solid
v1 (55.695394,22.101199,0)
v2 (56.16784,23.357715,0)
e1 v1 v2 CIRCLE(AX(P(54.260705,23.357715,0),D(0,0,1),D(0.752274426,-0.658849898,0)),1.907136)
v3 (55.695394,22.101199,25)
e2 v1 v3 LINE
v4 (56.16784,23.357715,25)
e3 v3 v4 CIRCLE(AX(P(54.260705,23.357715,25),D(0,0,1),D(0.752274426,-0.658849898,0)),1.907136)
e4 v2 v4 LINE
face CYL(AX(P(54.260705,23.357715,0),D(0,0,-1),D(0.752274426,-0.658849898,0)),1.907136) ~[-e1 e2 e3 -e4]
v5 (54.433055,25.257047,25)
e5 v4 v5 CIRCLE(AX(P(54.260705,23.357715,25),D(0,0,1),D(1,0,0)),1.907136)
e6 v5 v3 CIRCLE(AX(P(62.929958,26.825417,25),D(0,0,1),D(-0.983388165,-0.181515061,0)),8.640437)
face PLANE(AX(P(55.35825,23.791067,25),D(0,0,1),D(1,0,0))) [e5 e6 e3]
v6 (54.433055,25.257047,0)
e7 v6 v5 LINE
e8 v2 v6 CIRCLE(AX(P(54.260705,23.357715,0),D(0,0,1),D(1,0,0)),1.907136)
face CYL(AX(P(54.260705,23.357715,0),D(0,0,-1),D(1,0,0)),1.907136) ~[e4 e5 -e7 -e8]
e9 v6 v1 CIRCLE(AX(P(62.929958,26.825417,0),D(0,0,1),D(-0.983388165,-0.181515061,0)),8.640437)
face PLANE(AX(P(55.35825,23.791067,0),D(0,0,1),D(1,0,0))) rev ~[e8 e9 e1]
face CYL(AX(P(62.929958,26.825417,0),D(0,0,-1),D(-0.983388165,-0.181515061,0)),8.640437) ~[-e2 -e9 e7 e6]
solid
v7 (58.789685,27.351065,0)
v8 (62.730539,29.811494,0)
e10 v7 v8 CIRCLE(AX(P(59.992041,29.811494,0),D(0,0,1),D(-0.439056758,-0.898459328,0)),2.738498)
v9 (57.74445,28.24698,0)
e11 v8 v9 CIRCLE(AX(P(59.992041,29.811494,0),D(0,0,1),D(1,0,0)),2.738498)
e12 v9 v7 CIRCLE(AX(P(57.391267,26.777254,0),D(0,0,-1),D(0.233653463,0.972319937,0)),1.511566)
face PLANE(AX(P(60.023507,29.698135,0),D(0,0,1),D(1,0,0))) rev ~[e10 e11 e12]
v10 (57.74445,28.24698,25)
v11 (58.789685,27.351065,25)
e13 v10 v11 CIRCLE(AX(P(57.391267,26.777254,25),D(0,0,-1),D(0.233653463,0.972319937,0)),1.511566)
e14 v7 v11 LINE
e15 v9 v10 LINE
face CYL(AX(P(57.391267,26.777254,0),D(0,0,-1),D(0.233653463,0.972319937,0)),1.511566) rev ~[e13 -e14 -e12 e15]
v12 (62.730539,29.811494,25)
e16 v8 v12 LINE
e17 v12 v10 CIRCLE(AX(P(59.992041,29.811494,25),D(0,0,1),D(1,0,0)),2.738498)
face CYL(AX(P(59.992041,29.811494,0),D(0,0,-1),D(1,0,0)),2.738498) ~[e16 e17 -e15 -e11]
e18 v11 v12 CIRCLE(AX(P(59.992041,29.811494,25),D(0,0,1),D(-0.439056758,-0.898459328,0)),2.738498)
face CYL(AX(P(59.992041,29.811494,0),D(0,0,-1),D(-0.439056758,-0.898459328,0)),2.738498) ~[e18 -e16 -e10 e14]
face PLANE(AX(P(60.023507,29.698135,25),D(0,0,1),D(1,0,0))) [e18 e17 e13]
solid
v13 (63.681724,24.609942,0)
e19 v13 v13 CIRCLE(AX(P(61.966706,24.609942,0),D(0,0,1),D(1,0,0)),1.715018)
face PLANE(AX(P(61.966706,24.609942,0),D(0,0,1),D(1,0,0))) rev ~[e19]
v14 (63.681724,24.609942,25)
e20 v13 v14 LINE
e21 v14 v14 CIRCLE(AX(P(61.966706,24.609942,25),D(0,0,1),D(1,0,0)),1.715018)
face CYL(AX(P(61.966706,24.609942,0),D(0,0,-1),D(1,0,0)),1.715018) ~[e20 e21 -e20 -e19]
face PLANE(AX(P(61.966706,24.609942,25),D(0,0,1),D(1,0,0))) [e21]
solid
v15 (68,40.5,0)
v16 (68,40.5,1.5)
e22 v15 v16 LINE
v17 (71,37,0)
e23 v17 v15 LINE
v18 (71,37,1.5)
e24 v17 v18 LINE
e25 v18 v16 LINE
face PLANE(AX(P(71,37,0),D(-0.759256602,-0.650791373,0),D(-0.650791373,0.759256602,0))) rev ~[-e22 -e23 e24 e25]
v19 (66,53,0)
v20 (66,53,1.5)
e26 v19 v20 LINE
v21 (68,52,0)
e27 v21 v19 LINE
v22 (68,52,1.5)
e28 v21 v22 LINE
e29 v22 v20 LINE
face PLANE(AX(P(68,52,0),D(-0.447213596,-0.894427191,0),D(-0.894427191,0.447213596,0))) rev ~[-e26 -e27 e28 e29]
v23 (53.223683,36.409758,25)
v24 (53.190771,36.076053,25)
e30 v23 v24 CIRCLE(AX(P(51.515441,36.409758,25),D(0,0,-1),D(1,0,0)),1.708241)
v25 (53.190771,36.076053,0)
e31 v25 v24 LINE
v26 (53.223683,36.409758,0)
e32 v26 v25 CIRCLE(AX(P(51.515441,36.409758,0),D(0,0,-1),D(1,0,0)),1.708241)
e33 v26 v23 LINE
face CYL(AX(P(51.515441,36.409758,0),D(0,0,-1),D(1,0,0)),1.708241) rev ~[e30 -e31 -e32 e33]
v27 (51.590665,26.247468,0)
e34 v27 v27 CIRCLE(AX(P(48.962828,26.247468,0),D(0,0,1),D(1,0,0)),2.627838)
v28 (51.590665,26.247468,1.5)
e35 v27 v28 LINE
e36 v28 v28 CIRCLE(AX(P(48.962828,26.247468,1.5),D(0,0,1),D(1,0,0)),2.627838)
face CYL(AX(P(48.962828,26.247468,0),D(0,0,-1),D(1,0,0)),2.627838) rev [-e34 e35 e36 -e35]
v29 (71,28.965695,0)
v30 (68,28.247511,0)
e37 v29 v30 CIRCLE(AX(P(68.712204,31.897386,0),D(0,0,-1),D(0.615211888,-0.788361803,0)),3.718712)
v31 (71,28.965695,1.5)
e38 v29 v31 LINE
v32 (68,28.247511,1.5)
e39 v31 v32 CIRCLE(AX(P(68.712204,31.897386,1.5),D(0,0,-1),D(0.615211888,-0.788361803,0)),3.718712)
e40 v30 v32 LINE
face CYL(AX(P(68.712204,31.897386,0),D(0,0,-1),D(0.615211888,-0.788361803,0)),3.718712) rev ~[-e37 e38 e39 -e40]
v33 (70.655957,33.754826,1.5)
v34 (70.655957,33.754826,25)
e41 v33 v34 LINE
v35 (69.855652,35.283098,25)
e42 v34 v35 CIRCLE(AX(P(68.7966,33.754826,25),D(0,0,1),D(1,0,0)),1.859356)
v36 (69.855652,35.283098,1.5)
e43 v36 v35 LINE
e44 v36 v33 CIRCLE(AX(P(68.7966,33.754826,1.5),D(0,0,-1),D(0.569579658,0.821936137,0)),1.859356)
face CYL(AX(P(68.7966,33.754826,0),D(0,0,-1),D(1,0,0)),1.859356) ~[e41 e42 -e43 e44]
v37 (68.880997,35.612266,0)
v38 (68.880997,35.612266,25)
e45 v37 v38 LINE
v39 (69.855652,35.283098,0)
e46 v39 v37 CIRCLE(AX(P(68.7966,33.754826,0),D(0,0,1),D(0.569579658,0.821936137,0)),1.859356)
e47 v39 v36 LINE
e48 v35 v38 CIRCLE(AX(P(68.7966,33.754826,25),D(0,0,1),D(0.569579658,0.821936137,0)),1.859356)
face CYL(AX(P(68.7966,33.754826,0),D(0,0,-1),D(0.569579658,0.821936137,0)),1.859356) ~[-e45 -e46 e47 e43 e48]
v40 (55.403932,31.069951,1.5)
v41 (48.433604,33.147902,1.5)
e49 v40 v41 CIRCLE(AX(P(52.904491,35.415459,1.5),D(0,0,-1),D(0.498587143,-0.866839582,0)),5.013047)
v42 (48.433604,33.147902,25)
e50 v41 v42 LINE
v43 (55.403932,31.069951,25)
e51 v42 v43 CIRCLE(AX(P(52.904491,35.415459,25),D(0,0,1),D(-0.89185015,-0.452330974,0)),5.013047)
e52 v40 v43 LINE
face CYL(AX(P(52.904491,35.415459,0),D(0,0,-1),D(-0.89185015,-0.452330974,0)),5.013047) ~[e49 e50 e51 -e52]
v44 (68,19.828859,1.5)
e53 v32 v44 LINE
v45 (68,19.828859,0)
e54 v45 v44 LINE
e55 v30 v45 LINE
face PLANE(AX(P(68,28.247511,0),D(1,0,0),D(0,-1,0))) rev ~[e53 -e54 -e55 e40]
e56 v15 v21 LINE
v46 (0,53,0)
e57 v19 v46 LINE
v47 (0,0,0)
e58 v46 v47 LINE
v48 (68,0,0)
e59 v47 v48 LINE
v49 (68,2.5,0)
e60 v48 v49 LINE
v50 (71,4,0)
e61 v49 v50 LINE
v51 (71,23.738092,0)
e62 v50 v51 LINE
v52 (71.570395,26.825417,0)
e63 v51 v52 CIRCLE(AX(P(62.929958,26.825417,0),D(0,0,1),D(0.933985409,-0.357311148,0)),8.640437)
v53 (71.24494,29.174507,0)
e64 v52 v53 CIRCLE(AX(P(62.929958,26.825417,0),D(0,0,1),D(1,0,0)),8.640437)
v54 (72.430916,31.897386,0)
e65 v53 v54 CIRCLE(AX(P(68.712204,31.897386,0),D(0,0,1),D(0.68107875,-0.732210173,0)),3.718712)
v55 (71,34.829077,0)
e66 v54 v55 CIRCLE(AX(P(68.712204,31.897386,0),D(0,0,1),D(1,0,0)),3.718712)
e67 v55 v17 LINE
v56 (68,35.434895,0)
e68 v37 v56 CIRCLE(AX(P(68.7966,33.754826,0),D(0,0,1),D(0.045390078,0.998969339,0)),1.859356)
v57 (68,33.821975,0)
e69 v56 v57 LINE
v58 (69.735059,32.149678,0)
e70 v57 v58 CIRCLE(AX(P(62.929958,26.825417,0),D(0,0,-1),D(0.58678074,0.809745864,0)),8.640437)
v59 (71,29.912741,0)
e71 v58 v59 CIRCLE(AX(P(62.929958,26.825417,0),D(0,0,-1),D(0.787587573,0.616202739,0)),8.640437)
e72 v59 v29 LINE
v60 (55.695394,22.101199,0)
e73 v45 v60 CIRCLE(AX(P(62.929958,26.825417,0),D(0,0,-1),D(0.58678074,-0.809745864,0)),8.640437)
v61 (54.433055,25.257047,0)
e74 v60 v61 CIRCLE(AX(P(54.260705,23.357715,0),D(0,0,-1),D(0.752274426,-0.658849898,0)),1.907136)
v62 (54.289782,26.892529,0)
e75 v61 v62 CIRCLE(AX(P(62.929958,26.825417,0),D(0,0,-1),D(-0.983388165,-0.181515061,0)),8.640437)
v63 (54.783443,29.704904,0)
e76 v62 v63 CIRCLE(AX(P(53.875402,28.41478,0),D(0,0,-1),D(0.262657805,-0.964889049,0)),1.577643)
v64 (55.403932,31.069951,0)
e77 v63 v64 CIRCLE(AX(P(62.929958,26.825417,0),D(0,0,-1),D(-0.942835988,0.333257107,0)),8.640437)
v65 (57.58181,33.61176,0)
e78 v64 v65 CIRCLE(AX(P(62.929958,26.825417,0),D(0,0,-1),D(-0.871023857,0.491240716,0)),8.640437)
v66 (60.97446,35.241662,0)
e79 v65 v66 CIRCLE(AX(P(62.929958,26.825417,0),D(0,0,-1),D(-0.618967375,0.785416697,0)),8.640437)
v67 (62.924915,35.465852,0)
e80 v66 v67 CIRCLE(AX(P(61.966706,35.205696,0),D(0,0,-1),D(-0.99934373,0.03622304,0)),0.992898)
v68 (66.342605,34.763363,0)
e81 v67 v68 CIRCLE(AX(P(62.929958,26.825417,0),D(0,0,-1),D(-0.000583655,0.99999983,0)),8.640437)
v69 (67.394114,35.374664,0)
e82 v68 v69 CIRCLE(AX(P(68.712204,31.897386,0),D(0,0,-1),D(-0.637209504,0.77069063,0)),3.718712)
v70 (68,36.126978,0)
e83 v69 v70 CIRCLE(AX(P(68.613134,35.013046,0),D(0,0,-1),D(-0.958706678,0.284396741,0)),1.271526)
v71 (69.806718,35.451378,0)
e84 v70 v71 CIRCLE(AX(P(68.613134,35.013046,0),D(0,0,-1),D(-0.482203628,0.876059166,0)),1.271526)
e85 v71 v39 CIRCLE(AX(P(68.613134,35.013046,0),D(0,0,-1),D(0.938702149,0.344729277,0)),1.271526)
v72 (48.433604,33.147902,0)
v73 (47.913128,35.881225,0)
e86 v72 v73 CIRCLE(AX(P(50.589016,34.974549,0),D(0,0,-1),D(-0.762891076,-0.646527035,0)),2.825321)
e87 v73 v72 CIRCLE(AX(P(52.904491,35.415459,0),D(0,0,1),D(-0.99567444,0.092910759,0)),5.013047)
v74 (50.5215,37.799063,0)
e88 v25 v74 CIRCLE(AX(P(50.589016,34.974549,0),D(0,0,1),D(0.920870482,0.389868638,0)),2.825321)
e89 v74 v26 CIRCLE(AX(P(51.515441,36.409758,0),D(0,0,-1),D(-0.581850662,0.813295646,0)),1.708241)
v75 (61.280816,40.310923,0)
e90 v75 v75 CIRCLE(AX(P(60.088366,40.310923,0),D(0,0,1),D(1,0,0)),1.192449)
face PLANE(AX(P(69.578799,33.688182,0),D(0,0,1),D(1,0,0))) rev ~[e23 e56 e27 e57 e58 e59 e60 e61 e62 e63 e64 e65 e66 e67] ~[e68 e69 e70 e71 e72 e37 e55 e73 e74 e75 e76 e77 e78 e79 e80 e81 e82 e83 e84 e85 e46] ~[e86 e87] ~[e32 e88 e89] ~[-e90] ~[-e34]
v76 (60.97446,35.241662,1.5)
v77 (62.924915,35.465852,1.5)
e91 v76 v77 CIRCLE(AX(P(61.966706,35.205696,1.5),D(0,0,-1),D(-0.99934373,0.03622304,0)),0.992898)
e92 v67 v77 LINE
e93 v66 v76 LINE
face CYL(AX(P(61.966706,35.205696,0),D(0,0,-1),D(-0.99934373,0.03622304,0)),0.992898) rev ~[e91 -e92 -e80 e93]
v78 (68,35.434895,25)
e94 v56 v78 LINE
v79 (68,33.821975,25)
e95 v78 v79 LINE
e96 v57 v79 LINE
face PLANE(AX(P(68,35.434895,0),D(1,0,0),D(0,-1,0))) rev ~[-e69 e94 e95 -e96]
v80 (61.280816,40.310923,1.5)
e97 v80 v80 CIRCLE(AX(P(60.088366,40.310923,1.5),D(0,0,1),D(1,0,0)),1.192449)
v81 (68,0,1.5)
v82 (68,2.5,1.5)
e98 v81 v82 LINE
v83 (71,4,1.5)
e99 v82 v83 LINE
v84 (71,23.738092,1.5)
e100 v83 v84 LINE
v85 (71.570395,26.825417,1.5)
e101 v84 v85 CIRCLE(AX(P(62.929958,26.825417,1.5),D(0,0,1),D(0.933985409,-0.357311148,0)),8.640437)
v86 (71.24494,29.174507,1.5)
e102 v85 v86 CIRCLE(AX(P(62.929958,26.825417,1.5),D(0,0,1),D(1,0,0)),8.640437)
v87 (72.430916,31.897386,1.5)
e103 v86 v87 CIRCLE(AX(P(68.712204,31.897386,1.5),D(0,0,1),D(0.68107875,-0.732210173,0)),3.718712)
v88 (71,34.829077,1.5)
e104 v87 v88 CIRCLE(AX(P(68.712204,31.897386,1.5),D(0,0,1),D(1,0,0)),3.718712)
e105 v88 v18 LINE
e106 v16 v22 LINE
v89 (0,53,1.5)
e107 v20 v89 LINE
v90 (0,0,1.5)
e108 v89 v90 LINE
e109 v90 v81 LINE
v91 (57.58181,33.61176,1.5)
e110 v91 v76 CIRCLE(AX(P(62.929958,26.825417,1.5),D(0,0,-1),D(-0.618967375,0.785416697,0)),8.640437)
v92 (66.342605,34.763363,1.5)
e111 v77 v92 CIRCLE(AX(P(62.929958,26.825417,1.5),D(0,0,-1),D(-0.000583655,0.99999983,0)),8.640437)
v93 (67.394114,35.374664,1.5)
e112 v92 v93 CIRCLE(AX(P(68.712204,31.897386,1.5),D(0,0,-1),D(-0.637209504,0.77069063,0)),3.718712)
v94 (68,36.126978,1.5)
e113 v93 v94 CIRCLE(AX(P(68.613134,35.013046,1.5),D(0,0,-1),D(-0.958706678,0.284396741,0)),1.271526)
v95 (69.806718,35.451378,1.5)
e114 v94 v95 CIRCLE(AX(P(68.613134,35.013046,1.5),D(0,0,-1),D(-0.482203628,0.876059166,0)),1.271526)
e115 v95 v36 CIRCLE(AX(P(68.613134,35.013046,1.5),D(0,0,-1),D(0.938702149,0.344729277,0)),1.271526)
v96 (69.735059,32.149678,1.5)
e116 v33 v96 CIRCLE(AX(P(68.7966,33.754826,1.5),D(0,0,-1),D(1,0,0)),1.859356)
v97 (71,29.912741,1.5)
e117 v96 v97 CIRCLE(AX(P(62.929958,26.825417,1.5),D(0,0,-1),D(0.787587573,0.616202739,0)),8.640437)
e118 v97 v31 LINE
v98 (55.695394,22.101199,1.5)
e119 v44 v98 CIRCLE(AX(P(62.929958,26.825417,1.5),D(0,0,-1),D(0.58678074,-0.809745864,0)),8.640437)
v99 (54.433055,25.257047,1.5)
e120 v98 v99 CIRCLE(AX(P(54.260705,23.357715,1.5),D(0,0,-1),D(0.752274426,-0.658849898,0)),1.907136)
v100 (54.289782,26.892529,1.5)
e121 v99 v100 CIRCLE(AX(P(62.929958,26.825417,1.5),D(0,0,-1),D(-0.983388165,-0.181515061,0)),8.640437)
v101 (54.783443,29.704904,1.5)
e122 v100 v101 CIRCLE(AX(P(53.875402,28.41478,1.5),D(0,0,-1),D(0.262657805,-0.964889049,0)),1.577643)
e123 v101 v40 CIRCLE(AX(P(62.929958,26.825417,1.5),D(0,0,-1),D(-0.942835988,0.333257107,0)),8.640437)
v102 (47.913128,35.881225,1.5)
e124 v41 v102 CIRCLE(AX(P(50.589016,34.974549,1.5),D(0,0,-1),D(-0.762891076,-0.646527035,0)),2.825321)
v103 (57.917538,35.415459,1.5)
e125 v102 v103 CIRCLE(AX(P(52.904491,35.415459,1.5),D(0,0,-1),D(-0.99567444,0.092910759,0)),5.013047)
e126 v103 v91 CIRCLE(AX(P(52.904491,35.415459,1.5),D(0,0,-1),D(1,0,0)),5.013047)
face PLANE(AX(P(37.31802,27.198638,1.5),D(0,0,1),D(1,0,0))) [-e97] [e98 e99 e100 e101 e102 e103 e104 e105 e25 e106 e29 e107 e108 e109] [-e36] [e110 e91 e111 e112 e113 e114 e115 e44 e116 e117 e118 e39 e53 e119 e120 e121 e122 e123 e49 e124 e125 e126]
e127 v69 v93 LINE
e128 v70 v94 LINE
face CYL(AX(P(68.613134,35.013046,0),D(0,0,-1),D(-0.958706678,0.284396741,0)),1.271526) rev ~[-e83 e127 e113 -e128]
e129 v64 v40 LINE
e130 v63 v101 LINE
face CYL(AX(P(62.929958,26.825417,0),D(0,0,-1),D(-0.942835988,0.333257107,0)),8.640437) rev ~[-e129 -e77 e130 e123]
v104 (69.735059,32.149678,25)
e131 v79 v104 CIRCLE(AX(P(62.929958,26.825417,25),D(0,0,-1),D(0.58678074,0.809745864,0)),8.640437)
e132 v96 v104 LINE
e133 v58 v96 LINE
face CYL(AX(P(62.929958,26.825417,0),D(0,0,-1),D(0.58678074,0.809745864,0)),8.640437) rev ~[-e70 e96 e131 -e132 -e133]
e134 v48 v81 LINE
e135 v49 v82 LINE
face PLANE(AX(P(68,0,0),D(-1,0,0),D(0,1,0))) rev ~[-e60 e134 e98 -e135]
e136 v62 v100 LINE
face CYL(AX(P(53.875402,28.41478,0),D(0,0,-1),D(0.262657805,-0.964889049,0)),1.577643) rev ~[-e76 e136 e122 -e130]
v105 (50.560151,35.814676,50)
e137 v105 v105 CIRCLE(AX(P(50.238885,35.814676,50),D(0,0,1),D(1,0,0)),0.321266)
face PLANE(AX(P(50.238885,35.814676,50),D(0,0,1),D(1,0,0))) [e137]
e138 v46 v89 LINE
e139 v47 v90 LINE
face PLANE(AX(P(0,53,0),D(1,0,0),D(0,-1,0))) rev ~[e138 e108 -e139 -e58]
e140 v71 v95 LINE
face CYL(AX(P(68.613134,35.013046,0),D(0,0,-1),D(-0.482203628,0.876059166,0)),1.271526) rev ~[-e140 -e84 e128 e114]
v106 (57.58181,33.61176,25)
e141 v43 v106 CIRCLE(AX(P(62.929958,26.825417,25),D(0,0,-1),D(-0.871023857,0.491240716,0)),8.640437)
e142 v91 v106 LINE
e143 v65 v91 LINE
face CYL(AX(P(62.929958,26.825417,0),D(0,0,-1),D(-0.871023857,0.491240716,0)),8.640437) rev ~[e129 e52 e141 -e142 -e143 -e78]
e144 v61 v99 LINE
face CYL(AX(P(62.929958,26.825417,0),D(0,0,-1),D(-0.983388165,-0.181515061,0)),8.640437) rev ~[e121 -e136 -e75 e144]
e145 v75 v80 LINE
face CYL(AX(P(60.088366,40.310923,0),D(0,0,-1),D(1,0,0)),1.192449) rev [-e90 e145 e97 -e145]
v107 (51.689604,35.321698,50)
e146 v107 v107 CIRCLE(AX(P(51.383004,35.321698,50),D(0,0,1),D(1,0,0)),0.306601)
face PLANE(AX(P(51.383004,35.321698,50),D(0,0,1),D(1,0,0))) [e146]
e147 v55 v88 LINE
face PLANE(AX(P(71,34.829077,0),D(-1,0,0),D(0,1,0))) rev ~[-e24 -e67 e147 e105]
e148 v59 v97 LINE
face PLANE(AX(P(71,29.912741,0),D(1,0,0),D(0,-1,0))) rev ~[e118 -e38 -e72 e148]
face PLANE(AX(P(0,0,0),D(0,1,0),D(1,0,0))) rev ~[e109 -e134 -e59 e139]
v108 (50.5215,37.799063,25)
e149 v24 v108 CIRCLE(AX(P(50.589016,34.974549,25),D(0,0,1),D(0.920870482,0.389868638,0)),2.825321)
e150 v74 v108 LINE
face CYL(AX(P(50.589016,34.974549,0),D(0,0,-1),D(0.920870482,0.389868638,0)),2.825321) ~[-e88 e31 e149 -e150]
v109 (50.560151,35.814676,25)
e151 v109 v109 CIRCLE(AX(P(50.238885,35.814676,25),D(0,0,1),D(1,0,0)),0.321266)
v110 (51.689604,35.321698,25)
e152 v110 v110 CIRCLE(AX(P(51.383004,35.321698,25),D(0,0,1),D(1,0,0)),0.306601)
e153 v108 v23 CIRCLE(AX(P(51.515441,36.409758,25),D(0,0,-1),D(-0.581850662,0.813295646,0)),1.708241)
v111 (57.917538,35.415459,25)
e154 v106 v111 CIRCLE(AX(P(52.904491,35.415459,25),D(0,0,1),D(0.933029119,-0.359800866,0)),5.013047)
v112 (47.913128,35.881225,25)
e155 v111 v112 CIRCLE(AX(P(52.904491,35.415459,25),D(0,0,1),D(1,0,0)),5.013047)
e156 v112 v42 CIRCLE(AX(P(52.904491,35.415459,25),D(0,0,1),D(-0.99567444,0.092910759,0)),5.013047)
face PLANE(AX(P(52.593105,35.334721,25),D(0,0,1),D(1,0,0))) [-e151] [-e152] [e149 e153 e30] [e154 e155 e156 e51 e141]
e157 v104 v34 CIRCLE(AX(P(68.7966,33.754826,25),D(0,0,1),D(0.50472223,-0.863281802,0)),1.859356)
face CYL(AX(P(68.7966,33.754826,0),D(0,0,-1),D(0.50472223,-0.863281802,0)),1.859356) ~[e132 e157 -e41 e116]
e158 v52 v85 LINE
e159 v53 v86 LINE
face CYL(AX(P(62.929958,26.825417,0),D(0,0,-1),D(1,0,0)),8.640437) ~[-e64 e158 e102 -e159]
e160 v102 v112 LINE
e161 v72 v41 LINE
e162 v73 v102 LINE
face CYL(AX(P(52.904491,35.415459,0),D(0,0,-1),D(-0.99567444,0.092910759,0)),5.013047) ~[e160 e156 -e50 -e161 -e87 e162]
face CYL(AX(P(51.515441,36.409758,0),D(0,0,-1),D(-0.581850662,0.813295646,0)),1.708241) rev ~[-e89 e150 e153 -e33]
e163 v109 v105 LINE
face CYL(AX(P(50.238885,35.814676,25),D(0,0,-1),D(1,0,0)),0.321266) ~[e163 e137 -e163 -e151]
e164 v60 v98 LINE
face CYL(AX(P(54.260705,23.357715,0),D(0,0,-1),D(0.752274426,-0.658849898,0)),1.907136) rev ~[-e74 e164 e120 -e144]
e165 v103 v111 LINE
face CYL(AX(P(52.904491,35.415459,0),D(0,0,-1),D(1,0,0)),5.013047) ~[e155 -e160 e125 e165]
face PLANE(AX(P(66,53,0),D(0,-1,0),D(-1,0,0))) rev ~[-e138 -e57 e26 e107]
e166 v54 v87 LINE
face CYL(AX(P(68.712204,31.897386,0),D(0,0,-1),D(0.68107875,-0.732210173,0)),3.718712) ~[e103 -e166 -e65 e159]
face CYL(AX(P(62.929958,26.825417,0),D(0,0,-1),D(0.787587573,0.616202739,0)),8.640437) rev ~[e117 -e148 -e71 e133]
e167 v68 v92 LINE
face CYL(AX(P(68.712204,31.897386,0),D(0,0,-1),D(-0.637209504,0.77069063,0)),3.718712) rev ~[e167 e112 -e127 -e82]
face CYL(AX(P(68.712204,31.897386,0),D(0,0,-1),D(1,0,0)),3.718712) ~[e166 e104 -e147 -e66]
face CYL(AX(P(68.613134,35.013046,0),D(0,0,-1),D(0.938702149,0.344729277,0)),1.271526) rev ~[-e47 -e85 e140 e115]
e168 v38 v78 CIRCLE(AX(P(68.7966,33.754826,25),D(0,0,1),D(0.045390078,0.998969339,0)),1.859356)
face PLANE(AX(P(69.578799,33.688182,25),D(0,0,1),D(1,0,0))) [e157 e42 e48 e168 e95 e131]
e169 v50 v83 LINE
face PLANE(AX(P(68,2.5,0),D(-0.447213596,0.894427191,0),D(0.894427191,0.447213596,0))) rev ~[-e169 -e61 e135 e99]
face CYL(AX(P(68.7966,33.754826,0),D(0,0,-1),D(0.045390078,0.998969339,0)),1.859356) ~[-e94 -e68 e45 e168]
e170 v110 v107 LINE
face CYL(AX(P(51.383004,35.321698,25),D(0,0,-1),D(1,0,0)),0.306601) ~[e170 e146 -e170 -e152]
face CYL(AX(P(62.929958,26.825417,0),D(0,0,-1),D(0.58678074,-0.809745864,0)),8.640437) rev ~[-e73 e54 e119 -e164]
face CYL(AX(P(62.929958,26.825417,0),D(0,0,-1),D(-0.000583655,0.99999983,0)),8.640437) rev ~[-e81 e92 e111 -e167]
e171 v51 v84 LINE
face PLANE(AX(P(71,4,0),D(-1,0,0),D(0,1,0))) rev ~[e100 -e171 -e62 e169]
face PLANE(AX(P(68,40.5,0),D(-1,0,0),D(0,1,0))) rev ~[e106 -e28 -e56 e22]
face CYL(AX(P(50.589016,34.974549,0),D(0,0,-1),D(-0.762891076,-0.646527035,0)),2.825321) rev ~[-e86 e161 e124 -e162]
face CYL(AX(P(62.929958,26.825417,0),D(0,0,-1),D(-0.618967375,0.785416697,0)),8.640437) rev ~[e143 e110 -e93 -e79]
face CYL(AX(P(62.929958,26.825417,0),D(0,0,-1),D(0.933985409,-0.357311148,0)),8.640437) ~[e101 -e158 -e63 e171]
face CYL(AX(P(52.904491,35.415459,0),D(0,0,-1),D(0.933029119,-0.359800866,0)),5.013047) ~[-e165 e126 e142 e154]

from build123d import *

# Parameters (mm, degrees)
F0_R     = 2.6278375122
F0_R_2   = 1.1924493759
F1_DEPTH = 1.5
F2_DEPTH = 25
F0_R_3   = 1.7150177914
F3_R     = 0.3066007816
F3_R_2   = 0.3212661132
F4_DEPTH = 25
F5_DEPTH = 25


with BuildPart() as f1:
    # F0 (on Top) → F1 (new body)
    with BuildSketch(Plane.XY):
        with BuildLine():
            Line((0, 53), (0, 0))
            Line((0, 0), (68, 0))
            Line((68, 0), (68, 2.5))
            Line((68, 2.5), (68, 19.8288588746))
            ThreePointArc((68, 19.8288588746), (61.3608271995, 18.3286541388), (55.6953940617, 22.1011993122))
            ThreePointArc((55.6953940617, 22.1011993122), (52.4899736453, 22.6494230493), (54.4330548178, 25.2570474218))
            ThreePointArc((54.4330548178, 25.2570474218), (54.3224861562, 26.0713778864), (54.289781951, 26.8925294981))
            ThreePointArc((54.289781951, 26.8925294981), (52.3215154133, 28.6875368607), (54.7834433366, 29.7049038033))
            ThreePointArc((54.7834433366, 29.7049038033), (55.0640203529, 30.4009127933), (55.4039315186, 31.0699511896))
            ThreePointArc((55.4039315186, 31.0699511896), (51.4723174683, 30.611343819), (48.4336038497, 33.1479023744))
            ThreePointArc((48.4336038497, 33.1479023744), (47.8135649338, 34.4460507642), (47.91312779, 35.881224878))
            ThreePointArc((47.91312779, 35.881224878), (53.1376259317, 40.4230819927), (57.9175378005, 35.4154588629))
            ThreePointArc((57.9175378005, 35.4154588629), (57.8328911136, 34.4981199945), (57.5818096181, 33.6117601669))
            ThreePointArc((57.5818096181, 33.6117601669), (59.188306317, 34.613689426), (60.9744599761, 35.241661551))
            ThreePointArc((60.9744599761, 35.241661551), (61.8533262271, 36.1920987658), (62.9249150732, 35.4658521608))
            ThreePointArc((62.9249150732, 35.4658521608), (64.6695885562, 35.2889169352), (66.3426051765, 34.7633629182))
            ThreePointArc((66.3426051765, 34.7633629182), (66.8431977831, 35.1122947347), (67.3941141066, 35.3746638923))
            ThreePointArc((67.3941141066, 35.3746638923), (67.6228355533, 35.8105961465), (68, 36.1269778946))
            Line((68, 36.1269778946), (68, 37))
            Line((68, 37), (68, 40.5))
            Line((68, 40.5), (68, 52))
            Line((68, 52), (66, 53))
            Line((66, 53), (0, 53))
        make_face()
        with Locations((48.9628277719, 26.2474678457)):
            Circle(F0_R, mode=Mode.SUBTRACT)
        with Locations((60.0883662701, 40.3109230101)):
            Circle(F0_R_2, mode=Mode.SUBTRACT)
        with BuildLine():
            Line((68, 19.8288588746), (68, 2.5))
            Line((68, 2.5), (71, 4))
            Line((71, 4), (71, 23.7380924418))
            ThreePointArc((71, 23.7380924418), (69.7845899166, 21.5650774133), (68, 19.8288588746))
        make_face()
        with BuildLine():
            Line((68, 28.2475113294), (68, 19.8288588746))
            ThreePointArc((68, 19.8288588746), (69.7845899166, 21.5650774133), (71, 23.7380924418))
            Line((71, 23.7380924418), (71, 28.9656954726))
            ThreePointArc((71, 28.9656954726), (69.5779809067, 28.2808614275), (68, 28.2475113294))
        make_face()
        with BuildLine():
            Line((71, 28.9656954726), (71, 23.7380924418))
            ThreePointArc((71, 23.7380924418), (71.4265996488, 25.2556300447), (71.5703949044, 26.8254168332))
            ThreePointArc((71.5703949044, 26.8254168332), (71.488644419, 28.0111810019), (71.244939908, 29.1745072318))
            ThreePointArc((71.244939908, 29.1745072318), (71.1247301774, 29.06745007), (71, 28.9656954726))
        make_face()
        Polygon((71, 37), (68, 40.5), (68, 37), align=None)
        with BuildLine():
            Line((71, 29.9127412246), (71, 28.9656954726))
            ThreePointArc((71, 28.9656954726), (71.1247301774, 29.06745007), (71.244939908, 29.1745072318))
            ThreePointArc((71.244939908, 29.1745072318), (71.1307810974, 29.5463817966), (71, 29.9127412246))
        make_face()
        with BuildLine():
            Line((71, 37), (68, 37))
            Line((68, 37), (68, 36.1269778946))
            ThreePointArc((68, 36.1269778946), (69.0584871691, 36.2040282952), (69.8067182705, 35.4513782636))
            ThreePointArc((69.8067182705, 35.4513782636), (70.4317447612, 35.1946578959), (71, 34.8290769271))
            Line((71, 34.8290769271), (71, 37))
        make_face()
        with BuildLine():
            ThreePointArc((70.6559565162, 33.7548259768), (70.4093826923, 32.8295484731), (69.7350587516, 32.1496776527))
            ThreePointArc((69.7350587516, 32.1496776527), (70.4511573148, 31.0784993072), (71, 29.9127412246))
            Line((71, 29.9127412246), (71, 34.8290769271))
            ThreePointArc((71, 34.8290769271), (70.4317447612, 35.1946578959), (69.8067182705, 35.4513782636))
            ThreePointArc((69.8067182705, 35.4513782636), (69.8340876843, 35.3680821722), (69.8556518079, 35.2830979841))
            ThreePointArc((69.8556518079, 35.2830979841), (70.4437735665, 34.6173952428), (70.6559565162, 33.7548259768))
        make_face()
        with BuildLine():
            Line((71, 34.8290769271), (71, 29.9127412246))
            ThreePointArc((71, 29.9127412246), (71.1307810974, 29.5463817966), (71.244939908, 29.1745072318))
            ThreePointArc((71.244939908, 29.1745072318), (72.1215541699, 30.4124106248), (72.4309162817, 31.8973861998))
            ThreePointArc((72.4309162817, 31.8973861998), (72.0540953895, 33.5285155575), (71, 34.8290769271))
        make_face()
    extrude(amount=F1_DEPTH)

    # F0 (on Top) → F2, piece 2 (join)
    with BuildSketch(Plane.XY):
        with BuildLine():
            Line((68, 33.8991143367), (68, 33.8219747917))
            ThreePointArc((68, 33.8219747917), (68.9261149597, 33.0466105336), (69.7350587516, 32.1496776527))
            ThreePointArc((69.7350587516, 32.1496776527), (70.4093826923, 32.8295484731), (70.6559565162, 33.7548259768))
            ThreePointArc((70.6559565162, 33.7548259768), (70.4437735665, 34.6173952428), (69.8556518079, 35.2830979841))
            ThreePointArc((69.8556518079, 35.2830979841), (69.8773872009, 35.1488488132), (69.8846600648, 35.0130461156))
            ThreePointArc((69.8846600648, 35.0130461156), (69.2601125437, 33.9184243125), (68, 33.8991143367))
        make_face()
        with BuildLine():
            Line((68, 35.4348953571), (68, 33.8991143367))
            ThreePointArc((68, 33.8991143367), (69.2601125437, 33.9184243125), (69.8846600648, 35.0130461156))
            ThreePointArc((69.8846600648, 35.0130461156), (69.8773872009, 35.1488488132), (69.8556518079, 35.2830979841))
            ThreePointArc((69.8556518079, 35.2830979841), (69.3915424263, 35.5164301392), (68.8809966916, 35.6122657564))
            ThreePointArc((68.8809966916, 35.6122657564), (68.4296211931, 35.5776072464), (68, 35.4348953571))
        make_face()
        with BuildLine():
            ThreePointArc((55.4039315186, 31.0699511896), (56.3686096023, 32.4473252198), (57.5818096181, 33.6117601669))
            ThreePointArc((57.5818096181, 33.6117601669), (57.8328911136, 34.4981199945), (57.9175378005, 35.4154588629))
            ThreePointArc((57.9175378005, 35.4154588629), (53.1376259317, 40.4230819927), (47.91312779, 35.881224878))
            ThreePointArc((47.91312779, 35.881224878), (48.9153694852, 37.2508061123), (50.5214999846, 37.7990633442))
            ThreePointArc((50.5214999846, 37.7990633442), (52.2965293748, 37.9289651674), (53.2236828127, 36.4097580314))
            ThreePointArc((53.2236828127, 36.4097580314), (53.2154349825, 36.2420960388), (53.1907711372, 36.0760530769))
            ThreePointArc((53.1907711372, 36.0760530769), (53.3578818186, 35.5365305334), (53.414337444, 34.9745489348))
            ThreePointArc((53.414337444, 34.9745489348), (51.5618234293, 32.3219867398), (48.4336038497, 33.1479023744))
            ThreePointArc((48.4336038497, 33.1479023744), (51.4723174683, 30.611343819), (55.4039315186, 31.0699511896))
        make_face()
        with BuildLine():
            ThreePointArc((47.91312779, 35.881224878), (47.9799292355, 34.4777296591), (48.4336038497, 33.1479023744))
            ThreePointArc((48.4336038497, 33.1479023744), (51.5618234293, 32.3219867398), (53.414337444, 34.9745489348))
            ThreePointArc((53.414337444, 34.9745489348), (53.3578818186, 35.5365305334), (53.1907711372, 36.0760530769))
            ThreePointArc((53.1907711372, 36.0760530769), (50.5890162075, 34.9745489348), (50.5214999846, 37.7990633442))
            ThreePointArc((50.5214999846, 37.7990633442), (48.9153694852, 37.2508061123), (47.91312779, 35.881224878))
        make_face()
        with BuildLine():
            ThreePointArc((53.1907711372, 36.0760530769), (52.1212637564, 37.3482922946), (50.5214999846, 37.7990633442))
            ThreePointArc((50.5214999846, 37.7990633442), (50.5890162075, 34.9745489348), (53.1907711372, 36.0760530769))
        make_face()
    extrude(amount=F2_DEPTH)

    # F3 (on face) → F4 (join)
    with BuildSketch(Plane.XY.offset(25)):
        with Locations((51.3830035925, 35.3216975927)):
            Circle(F3_R)
        with Locations((50.2388849854, 35.8146764338)):
            Circle(F3_R_2)
    extrude(amount=-F4_DEPTH)

    # F3 (on face) → F5 (join)
    with BuildSketch(Plane.XY.offset(25)):
        with Locations((51.3830035925, 35.3216975927)):
            Circle(F3_R)
        with Locations((50.2388849854, 35.8146764338)):
            Circle(F3_R_2)
    extrude(amount=F5_DEPTH)


with BuildPart() as f2:
    # F0 (on Top) → F2 (new body)
    with BuildSketch(Plane.XY):
        with BuildLine():
            ThreePointArc((54.4330548178, 25.2570474218), (54.9075139378, 23.6164391663), (55.6953940617, 22.1011993122))
            ThreePointArc((55.6953940617, 22.1011993122), (56.0458256446, 22.686515355), (56.1678403419, 23.3577154577))
            ThreePointArc((56.1678403419, 23.3577154577), (55.668870425, 24.6438863954), (54.4330548178, 25.2570474218))
        make_face()
    extrude(amount=F2_DEPTH)


with BuildPart() as f2b:
    # F0 (on Top) → F2, piece 3 (new body)
    with BuildSketch(Plane.XY):
        with BuildLine():
            ThreePointArc((57.7444498964, 28.2469801579), (58.3749807915, 27.924921367), (58.7896853725, 27.3510649521))
            ThreePointArc((58.7896853725, 27.3510649521), (61.4423382614, 27.4885625868), (62.7305394701, 29.8114940524))
            ThreePointArc((62.7305394701, 29.8114940524), (59.1721797268, 32.4243848348), (57.7444498964, 28.2469801579))
        make_face()
    extrude(amount=F2_DEPTH)


with BuildPart() as f2c:
    # F0 (on Top) → F2, piece 4 (new body)
    with BuildSketch(Plane.XY):
        with Locations((61.9667060673, 24.6099419892)):
            Circle(F0_R_3)
    extrude(amount=F2_DEPTH)


solid = Compound([f1.part, f2.part, f2b.part, f2c.part])
